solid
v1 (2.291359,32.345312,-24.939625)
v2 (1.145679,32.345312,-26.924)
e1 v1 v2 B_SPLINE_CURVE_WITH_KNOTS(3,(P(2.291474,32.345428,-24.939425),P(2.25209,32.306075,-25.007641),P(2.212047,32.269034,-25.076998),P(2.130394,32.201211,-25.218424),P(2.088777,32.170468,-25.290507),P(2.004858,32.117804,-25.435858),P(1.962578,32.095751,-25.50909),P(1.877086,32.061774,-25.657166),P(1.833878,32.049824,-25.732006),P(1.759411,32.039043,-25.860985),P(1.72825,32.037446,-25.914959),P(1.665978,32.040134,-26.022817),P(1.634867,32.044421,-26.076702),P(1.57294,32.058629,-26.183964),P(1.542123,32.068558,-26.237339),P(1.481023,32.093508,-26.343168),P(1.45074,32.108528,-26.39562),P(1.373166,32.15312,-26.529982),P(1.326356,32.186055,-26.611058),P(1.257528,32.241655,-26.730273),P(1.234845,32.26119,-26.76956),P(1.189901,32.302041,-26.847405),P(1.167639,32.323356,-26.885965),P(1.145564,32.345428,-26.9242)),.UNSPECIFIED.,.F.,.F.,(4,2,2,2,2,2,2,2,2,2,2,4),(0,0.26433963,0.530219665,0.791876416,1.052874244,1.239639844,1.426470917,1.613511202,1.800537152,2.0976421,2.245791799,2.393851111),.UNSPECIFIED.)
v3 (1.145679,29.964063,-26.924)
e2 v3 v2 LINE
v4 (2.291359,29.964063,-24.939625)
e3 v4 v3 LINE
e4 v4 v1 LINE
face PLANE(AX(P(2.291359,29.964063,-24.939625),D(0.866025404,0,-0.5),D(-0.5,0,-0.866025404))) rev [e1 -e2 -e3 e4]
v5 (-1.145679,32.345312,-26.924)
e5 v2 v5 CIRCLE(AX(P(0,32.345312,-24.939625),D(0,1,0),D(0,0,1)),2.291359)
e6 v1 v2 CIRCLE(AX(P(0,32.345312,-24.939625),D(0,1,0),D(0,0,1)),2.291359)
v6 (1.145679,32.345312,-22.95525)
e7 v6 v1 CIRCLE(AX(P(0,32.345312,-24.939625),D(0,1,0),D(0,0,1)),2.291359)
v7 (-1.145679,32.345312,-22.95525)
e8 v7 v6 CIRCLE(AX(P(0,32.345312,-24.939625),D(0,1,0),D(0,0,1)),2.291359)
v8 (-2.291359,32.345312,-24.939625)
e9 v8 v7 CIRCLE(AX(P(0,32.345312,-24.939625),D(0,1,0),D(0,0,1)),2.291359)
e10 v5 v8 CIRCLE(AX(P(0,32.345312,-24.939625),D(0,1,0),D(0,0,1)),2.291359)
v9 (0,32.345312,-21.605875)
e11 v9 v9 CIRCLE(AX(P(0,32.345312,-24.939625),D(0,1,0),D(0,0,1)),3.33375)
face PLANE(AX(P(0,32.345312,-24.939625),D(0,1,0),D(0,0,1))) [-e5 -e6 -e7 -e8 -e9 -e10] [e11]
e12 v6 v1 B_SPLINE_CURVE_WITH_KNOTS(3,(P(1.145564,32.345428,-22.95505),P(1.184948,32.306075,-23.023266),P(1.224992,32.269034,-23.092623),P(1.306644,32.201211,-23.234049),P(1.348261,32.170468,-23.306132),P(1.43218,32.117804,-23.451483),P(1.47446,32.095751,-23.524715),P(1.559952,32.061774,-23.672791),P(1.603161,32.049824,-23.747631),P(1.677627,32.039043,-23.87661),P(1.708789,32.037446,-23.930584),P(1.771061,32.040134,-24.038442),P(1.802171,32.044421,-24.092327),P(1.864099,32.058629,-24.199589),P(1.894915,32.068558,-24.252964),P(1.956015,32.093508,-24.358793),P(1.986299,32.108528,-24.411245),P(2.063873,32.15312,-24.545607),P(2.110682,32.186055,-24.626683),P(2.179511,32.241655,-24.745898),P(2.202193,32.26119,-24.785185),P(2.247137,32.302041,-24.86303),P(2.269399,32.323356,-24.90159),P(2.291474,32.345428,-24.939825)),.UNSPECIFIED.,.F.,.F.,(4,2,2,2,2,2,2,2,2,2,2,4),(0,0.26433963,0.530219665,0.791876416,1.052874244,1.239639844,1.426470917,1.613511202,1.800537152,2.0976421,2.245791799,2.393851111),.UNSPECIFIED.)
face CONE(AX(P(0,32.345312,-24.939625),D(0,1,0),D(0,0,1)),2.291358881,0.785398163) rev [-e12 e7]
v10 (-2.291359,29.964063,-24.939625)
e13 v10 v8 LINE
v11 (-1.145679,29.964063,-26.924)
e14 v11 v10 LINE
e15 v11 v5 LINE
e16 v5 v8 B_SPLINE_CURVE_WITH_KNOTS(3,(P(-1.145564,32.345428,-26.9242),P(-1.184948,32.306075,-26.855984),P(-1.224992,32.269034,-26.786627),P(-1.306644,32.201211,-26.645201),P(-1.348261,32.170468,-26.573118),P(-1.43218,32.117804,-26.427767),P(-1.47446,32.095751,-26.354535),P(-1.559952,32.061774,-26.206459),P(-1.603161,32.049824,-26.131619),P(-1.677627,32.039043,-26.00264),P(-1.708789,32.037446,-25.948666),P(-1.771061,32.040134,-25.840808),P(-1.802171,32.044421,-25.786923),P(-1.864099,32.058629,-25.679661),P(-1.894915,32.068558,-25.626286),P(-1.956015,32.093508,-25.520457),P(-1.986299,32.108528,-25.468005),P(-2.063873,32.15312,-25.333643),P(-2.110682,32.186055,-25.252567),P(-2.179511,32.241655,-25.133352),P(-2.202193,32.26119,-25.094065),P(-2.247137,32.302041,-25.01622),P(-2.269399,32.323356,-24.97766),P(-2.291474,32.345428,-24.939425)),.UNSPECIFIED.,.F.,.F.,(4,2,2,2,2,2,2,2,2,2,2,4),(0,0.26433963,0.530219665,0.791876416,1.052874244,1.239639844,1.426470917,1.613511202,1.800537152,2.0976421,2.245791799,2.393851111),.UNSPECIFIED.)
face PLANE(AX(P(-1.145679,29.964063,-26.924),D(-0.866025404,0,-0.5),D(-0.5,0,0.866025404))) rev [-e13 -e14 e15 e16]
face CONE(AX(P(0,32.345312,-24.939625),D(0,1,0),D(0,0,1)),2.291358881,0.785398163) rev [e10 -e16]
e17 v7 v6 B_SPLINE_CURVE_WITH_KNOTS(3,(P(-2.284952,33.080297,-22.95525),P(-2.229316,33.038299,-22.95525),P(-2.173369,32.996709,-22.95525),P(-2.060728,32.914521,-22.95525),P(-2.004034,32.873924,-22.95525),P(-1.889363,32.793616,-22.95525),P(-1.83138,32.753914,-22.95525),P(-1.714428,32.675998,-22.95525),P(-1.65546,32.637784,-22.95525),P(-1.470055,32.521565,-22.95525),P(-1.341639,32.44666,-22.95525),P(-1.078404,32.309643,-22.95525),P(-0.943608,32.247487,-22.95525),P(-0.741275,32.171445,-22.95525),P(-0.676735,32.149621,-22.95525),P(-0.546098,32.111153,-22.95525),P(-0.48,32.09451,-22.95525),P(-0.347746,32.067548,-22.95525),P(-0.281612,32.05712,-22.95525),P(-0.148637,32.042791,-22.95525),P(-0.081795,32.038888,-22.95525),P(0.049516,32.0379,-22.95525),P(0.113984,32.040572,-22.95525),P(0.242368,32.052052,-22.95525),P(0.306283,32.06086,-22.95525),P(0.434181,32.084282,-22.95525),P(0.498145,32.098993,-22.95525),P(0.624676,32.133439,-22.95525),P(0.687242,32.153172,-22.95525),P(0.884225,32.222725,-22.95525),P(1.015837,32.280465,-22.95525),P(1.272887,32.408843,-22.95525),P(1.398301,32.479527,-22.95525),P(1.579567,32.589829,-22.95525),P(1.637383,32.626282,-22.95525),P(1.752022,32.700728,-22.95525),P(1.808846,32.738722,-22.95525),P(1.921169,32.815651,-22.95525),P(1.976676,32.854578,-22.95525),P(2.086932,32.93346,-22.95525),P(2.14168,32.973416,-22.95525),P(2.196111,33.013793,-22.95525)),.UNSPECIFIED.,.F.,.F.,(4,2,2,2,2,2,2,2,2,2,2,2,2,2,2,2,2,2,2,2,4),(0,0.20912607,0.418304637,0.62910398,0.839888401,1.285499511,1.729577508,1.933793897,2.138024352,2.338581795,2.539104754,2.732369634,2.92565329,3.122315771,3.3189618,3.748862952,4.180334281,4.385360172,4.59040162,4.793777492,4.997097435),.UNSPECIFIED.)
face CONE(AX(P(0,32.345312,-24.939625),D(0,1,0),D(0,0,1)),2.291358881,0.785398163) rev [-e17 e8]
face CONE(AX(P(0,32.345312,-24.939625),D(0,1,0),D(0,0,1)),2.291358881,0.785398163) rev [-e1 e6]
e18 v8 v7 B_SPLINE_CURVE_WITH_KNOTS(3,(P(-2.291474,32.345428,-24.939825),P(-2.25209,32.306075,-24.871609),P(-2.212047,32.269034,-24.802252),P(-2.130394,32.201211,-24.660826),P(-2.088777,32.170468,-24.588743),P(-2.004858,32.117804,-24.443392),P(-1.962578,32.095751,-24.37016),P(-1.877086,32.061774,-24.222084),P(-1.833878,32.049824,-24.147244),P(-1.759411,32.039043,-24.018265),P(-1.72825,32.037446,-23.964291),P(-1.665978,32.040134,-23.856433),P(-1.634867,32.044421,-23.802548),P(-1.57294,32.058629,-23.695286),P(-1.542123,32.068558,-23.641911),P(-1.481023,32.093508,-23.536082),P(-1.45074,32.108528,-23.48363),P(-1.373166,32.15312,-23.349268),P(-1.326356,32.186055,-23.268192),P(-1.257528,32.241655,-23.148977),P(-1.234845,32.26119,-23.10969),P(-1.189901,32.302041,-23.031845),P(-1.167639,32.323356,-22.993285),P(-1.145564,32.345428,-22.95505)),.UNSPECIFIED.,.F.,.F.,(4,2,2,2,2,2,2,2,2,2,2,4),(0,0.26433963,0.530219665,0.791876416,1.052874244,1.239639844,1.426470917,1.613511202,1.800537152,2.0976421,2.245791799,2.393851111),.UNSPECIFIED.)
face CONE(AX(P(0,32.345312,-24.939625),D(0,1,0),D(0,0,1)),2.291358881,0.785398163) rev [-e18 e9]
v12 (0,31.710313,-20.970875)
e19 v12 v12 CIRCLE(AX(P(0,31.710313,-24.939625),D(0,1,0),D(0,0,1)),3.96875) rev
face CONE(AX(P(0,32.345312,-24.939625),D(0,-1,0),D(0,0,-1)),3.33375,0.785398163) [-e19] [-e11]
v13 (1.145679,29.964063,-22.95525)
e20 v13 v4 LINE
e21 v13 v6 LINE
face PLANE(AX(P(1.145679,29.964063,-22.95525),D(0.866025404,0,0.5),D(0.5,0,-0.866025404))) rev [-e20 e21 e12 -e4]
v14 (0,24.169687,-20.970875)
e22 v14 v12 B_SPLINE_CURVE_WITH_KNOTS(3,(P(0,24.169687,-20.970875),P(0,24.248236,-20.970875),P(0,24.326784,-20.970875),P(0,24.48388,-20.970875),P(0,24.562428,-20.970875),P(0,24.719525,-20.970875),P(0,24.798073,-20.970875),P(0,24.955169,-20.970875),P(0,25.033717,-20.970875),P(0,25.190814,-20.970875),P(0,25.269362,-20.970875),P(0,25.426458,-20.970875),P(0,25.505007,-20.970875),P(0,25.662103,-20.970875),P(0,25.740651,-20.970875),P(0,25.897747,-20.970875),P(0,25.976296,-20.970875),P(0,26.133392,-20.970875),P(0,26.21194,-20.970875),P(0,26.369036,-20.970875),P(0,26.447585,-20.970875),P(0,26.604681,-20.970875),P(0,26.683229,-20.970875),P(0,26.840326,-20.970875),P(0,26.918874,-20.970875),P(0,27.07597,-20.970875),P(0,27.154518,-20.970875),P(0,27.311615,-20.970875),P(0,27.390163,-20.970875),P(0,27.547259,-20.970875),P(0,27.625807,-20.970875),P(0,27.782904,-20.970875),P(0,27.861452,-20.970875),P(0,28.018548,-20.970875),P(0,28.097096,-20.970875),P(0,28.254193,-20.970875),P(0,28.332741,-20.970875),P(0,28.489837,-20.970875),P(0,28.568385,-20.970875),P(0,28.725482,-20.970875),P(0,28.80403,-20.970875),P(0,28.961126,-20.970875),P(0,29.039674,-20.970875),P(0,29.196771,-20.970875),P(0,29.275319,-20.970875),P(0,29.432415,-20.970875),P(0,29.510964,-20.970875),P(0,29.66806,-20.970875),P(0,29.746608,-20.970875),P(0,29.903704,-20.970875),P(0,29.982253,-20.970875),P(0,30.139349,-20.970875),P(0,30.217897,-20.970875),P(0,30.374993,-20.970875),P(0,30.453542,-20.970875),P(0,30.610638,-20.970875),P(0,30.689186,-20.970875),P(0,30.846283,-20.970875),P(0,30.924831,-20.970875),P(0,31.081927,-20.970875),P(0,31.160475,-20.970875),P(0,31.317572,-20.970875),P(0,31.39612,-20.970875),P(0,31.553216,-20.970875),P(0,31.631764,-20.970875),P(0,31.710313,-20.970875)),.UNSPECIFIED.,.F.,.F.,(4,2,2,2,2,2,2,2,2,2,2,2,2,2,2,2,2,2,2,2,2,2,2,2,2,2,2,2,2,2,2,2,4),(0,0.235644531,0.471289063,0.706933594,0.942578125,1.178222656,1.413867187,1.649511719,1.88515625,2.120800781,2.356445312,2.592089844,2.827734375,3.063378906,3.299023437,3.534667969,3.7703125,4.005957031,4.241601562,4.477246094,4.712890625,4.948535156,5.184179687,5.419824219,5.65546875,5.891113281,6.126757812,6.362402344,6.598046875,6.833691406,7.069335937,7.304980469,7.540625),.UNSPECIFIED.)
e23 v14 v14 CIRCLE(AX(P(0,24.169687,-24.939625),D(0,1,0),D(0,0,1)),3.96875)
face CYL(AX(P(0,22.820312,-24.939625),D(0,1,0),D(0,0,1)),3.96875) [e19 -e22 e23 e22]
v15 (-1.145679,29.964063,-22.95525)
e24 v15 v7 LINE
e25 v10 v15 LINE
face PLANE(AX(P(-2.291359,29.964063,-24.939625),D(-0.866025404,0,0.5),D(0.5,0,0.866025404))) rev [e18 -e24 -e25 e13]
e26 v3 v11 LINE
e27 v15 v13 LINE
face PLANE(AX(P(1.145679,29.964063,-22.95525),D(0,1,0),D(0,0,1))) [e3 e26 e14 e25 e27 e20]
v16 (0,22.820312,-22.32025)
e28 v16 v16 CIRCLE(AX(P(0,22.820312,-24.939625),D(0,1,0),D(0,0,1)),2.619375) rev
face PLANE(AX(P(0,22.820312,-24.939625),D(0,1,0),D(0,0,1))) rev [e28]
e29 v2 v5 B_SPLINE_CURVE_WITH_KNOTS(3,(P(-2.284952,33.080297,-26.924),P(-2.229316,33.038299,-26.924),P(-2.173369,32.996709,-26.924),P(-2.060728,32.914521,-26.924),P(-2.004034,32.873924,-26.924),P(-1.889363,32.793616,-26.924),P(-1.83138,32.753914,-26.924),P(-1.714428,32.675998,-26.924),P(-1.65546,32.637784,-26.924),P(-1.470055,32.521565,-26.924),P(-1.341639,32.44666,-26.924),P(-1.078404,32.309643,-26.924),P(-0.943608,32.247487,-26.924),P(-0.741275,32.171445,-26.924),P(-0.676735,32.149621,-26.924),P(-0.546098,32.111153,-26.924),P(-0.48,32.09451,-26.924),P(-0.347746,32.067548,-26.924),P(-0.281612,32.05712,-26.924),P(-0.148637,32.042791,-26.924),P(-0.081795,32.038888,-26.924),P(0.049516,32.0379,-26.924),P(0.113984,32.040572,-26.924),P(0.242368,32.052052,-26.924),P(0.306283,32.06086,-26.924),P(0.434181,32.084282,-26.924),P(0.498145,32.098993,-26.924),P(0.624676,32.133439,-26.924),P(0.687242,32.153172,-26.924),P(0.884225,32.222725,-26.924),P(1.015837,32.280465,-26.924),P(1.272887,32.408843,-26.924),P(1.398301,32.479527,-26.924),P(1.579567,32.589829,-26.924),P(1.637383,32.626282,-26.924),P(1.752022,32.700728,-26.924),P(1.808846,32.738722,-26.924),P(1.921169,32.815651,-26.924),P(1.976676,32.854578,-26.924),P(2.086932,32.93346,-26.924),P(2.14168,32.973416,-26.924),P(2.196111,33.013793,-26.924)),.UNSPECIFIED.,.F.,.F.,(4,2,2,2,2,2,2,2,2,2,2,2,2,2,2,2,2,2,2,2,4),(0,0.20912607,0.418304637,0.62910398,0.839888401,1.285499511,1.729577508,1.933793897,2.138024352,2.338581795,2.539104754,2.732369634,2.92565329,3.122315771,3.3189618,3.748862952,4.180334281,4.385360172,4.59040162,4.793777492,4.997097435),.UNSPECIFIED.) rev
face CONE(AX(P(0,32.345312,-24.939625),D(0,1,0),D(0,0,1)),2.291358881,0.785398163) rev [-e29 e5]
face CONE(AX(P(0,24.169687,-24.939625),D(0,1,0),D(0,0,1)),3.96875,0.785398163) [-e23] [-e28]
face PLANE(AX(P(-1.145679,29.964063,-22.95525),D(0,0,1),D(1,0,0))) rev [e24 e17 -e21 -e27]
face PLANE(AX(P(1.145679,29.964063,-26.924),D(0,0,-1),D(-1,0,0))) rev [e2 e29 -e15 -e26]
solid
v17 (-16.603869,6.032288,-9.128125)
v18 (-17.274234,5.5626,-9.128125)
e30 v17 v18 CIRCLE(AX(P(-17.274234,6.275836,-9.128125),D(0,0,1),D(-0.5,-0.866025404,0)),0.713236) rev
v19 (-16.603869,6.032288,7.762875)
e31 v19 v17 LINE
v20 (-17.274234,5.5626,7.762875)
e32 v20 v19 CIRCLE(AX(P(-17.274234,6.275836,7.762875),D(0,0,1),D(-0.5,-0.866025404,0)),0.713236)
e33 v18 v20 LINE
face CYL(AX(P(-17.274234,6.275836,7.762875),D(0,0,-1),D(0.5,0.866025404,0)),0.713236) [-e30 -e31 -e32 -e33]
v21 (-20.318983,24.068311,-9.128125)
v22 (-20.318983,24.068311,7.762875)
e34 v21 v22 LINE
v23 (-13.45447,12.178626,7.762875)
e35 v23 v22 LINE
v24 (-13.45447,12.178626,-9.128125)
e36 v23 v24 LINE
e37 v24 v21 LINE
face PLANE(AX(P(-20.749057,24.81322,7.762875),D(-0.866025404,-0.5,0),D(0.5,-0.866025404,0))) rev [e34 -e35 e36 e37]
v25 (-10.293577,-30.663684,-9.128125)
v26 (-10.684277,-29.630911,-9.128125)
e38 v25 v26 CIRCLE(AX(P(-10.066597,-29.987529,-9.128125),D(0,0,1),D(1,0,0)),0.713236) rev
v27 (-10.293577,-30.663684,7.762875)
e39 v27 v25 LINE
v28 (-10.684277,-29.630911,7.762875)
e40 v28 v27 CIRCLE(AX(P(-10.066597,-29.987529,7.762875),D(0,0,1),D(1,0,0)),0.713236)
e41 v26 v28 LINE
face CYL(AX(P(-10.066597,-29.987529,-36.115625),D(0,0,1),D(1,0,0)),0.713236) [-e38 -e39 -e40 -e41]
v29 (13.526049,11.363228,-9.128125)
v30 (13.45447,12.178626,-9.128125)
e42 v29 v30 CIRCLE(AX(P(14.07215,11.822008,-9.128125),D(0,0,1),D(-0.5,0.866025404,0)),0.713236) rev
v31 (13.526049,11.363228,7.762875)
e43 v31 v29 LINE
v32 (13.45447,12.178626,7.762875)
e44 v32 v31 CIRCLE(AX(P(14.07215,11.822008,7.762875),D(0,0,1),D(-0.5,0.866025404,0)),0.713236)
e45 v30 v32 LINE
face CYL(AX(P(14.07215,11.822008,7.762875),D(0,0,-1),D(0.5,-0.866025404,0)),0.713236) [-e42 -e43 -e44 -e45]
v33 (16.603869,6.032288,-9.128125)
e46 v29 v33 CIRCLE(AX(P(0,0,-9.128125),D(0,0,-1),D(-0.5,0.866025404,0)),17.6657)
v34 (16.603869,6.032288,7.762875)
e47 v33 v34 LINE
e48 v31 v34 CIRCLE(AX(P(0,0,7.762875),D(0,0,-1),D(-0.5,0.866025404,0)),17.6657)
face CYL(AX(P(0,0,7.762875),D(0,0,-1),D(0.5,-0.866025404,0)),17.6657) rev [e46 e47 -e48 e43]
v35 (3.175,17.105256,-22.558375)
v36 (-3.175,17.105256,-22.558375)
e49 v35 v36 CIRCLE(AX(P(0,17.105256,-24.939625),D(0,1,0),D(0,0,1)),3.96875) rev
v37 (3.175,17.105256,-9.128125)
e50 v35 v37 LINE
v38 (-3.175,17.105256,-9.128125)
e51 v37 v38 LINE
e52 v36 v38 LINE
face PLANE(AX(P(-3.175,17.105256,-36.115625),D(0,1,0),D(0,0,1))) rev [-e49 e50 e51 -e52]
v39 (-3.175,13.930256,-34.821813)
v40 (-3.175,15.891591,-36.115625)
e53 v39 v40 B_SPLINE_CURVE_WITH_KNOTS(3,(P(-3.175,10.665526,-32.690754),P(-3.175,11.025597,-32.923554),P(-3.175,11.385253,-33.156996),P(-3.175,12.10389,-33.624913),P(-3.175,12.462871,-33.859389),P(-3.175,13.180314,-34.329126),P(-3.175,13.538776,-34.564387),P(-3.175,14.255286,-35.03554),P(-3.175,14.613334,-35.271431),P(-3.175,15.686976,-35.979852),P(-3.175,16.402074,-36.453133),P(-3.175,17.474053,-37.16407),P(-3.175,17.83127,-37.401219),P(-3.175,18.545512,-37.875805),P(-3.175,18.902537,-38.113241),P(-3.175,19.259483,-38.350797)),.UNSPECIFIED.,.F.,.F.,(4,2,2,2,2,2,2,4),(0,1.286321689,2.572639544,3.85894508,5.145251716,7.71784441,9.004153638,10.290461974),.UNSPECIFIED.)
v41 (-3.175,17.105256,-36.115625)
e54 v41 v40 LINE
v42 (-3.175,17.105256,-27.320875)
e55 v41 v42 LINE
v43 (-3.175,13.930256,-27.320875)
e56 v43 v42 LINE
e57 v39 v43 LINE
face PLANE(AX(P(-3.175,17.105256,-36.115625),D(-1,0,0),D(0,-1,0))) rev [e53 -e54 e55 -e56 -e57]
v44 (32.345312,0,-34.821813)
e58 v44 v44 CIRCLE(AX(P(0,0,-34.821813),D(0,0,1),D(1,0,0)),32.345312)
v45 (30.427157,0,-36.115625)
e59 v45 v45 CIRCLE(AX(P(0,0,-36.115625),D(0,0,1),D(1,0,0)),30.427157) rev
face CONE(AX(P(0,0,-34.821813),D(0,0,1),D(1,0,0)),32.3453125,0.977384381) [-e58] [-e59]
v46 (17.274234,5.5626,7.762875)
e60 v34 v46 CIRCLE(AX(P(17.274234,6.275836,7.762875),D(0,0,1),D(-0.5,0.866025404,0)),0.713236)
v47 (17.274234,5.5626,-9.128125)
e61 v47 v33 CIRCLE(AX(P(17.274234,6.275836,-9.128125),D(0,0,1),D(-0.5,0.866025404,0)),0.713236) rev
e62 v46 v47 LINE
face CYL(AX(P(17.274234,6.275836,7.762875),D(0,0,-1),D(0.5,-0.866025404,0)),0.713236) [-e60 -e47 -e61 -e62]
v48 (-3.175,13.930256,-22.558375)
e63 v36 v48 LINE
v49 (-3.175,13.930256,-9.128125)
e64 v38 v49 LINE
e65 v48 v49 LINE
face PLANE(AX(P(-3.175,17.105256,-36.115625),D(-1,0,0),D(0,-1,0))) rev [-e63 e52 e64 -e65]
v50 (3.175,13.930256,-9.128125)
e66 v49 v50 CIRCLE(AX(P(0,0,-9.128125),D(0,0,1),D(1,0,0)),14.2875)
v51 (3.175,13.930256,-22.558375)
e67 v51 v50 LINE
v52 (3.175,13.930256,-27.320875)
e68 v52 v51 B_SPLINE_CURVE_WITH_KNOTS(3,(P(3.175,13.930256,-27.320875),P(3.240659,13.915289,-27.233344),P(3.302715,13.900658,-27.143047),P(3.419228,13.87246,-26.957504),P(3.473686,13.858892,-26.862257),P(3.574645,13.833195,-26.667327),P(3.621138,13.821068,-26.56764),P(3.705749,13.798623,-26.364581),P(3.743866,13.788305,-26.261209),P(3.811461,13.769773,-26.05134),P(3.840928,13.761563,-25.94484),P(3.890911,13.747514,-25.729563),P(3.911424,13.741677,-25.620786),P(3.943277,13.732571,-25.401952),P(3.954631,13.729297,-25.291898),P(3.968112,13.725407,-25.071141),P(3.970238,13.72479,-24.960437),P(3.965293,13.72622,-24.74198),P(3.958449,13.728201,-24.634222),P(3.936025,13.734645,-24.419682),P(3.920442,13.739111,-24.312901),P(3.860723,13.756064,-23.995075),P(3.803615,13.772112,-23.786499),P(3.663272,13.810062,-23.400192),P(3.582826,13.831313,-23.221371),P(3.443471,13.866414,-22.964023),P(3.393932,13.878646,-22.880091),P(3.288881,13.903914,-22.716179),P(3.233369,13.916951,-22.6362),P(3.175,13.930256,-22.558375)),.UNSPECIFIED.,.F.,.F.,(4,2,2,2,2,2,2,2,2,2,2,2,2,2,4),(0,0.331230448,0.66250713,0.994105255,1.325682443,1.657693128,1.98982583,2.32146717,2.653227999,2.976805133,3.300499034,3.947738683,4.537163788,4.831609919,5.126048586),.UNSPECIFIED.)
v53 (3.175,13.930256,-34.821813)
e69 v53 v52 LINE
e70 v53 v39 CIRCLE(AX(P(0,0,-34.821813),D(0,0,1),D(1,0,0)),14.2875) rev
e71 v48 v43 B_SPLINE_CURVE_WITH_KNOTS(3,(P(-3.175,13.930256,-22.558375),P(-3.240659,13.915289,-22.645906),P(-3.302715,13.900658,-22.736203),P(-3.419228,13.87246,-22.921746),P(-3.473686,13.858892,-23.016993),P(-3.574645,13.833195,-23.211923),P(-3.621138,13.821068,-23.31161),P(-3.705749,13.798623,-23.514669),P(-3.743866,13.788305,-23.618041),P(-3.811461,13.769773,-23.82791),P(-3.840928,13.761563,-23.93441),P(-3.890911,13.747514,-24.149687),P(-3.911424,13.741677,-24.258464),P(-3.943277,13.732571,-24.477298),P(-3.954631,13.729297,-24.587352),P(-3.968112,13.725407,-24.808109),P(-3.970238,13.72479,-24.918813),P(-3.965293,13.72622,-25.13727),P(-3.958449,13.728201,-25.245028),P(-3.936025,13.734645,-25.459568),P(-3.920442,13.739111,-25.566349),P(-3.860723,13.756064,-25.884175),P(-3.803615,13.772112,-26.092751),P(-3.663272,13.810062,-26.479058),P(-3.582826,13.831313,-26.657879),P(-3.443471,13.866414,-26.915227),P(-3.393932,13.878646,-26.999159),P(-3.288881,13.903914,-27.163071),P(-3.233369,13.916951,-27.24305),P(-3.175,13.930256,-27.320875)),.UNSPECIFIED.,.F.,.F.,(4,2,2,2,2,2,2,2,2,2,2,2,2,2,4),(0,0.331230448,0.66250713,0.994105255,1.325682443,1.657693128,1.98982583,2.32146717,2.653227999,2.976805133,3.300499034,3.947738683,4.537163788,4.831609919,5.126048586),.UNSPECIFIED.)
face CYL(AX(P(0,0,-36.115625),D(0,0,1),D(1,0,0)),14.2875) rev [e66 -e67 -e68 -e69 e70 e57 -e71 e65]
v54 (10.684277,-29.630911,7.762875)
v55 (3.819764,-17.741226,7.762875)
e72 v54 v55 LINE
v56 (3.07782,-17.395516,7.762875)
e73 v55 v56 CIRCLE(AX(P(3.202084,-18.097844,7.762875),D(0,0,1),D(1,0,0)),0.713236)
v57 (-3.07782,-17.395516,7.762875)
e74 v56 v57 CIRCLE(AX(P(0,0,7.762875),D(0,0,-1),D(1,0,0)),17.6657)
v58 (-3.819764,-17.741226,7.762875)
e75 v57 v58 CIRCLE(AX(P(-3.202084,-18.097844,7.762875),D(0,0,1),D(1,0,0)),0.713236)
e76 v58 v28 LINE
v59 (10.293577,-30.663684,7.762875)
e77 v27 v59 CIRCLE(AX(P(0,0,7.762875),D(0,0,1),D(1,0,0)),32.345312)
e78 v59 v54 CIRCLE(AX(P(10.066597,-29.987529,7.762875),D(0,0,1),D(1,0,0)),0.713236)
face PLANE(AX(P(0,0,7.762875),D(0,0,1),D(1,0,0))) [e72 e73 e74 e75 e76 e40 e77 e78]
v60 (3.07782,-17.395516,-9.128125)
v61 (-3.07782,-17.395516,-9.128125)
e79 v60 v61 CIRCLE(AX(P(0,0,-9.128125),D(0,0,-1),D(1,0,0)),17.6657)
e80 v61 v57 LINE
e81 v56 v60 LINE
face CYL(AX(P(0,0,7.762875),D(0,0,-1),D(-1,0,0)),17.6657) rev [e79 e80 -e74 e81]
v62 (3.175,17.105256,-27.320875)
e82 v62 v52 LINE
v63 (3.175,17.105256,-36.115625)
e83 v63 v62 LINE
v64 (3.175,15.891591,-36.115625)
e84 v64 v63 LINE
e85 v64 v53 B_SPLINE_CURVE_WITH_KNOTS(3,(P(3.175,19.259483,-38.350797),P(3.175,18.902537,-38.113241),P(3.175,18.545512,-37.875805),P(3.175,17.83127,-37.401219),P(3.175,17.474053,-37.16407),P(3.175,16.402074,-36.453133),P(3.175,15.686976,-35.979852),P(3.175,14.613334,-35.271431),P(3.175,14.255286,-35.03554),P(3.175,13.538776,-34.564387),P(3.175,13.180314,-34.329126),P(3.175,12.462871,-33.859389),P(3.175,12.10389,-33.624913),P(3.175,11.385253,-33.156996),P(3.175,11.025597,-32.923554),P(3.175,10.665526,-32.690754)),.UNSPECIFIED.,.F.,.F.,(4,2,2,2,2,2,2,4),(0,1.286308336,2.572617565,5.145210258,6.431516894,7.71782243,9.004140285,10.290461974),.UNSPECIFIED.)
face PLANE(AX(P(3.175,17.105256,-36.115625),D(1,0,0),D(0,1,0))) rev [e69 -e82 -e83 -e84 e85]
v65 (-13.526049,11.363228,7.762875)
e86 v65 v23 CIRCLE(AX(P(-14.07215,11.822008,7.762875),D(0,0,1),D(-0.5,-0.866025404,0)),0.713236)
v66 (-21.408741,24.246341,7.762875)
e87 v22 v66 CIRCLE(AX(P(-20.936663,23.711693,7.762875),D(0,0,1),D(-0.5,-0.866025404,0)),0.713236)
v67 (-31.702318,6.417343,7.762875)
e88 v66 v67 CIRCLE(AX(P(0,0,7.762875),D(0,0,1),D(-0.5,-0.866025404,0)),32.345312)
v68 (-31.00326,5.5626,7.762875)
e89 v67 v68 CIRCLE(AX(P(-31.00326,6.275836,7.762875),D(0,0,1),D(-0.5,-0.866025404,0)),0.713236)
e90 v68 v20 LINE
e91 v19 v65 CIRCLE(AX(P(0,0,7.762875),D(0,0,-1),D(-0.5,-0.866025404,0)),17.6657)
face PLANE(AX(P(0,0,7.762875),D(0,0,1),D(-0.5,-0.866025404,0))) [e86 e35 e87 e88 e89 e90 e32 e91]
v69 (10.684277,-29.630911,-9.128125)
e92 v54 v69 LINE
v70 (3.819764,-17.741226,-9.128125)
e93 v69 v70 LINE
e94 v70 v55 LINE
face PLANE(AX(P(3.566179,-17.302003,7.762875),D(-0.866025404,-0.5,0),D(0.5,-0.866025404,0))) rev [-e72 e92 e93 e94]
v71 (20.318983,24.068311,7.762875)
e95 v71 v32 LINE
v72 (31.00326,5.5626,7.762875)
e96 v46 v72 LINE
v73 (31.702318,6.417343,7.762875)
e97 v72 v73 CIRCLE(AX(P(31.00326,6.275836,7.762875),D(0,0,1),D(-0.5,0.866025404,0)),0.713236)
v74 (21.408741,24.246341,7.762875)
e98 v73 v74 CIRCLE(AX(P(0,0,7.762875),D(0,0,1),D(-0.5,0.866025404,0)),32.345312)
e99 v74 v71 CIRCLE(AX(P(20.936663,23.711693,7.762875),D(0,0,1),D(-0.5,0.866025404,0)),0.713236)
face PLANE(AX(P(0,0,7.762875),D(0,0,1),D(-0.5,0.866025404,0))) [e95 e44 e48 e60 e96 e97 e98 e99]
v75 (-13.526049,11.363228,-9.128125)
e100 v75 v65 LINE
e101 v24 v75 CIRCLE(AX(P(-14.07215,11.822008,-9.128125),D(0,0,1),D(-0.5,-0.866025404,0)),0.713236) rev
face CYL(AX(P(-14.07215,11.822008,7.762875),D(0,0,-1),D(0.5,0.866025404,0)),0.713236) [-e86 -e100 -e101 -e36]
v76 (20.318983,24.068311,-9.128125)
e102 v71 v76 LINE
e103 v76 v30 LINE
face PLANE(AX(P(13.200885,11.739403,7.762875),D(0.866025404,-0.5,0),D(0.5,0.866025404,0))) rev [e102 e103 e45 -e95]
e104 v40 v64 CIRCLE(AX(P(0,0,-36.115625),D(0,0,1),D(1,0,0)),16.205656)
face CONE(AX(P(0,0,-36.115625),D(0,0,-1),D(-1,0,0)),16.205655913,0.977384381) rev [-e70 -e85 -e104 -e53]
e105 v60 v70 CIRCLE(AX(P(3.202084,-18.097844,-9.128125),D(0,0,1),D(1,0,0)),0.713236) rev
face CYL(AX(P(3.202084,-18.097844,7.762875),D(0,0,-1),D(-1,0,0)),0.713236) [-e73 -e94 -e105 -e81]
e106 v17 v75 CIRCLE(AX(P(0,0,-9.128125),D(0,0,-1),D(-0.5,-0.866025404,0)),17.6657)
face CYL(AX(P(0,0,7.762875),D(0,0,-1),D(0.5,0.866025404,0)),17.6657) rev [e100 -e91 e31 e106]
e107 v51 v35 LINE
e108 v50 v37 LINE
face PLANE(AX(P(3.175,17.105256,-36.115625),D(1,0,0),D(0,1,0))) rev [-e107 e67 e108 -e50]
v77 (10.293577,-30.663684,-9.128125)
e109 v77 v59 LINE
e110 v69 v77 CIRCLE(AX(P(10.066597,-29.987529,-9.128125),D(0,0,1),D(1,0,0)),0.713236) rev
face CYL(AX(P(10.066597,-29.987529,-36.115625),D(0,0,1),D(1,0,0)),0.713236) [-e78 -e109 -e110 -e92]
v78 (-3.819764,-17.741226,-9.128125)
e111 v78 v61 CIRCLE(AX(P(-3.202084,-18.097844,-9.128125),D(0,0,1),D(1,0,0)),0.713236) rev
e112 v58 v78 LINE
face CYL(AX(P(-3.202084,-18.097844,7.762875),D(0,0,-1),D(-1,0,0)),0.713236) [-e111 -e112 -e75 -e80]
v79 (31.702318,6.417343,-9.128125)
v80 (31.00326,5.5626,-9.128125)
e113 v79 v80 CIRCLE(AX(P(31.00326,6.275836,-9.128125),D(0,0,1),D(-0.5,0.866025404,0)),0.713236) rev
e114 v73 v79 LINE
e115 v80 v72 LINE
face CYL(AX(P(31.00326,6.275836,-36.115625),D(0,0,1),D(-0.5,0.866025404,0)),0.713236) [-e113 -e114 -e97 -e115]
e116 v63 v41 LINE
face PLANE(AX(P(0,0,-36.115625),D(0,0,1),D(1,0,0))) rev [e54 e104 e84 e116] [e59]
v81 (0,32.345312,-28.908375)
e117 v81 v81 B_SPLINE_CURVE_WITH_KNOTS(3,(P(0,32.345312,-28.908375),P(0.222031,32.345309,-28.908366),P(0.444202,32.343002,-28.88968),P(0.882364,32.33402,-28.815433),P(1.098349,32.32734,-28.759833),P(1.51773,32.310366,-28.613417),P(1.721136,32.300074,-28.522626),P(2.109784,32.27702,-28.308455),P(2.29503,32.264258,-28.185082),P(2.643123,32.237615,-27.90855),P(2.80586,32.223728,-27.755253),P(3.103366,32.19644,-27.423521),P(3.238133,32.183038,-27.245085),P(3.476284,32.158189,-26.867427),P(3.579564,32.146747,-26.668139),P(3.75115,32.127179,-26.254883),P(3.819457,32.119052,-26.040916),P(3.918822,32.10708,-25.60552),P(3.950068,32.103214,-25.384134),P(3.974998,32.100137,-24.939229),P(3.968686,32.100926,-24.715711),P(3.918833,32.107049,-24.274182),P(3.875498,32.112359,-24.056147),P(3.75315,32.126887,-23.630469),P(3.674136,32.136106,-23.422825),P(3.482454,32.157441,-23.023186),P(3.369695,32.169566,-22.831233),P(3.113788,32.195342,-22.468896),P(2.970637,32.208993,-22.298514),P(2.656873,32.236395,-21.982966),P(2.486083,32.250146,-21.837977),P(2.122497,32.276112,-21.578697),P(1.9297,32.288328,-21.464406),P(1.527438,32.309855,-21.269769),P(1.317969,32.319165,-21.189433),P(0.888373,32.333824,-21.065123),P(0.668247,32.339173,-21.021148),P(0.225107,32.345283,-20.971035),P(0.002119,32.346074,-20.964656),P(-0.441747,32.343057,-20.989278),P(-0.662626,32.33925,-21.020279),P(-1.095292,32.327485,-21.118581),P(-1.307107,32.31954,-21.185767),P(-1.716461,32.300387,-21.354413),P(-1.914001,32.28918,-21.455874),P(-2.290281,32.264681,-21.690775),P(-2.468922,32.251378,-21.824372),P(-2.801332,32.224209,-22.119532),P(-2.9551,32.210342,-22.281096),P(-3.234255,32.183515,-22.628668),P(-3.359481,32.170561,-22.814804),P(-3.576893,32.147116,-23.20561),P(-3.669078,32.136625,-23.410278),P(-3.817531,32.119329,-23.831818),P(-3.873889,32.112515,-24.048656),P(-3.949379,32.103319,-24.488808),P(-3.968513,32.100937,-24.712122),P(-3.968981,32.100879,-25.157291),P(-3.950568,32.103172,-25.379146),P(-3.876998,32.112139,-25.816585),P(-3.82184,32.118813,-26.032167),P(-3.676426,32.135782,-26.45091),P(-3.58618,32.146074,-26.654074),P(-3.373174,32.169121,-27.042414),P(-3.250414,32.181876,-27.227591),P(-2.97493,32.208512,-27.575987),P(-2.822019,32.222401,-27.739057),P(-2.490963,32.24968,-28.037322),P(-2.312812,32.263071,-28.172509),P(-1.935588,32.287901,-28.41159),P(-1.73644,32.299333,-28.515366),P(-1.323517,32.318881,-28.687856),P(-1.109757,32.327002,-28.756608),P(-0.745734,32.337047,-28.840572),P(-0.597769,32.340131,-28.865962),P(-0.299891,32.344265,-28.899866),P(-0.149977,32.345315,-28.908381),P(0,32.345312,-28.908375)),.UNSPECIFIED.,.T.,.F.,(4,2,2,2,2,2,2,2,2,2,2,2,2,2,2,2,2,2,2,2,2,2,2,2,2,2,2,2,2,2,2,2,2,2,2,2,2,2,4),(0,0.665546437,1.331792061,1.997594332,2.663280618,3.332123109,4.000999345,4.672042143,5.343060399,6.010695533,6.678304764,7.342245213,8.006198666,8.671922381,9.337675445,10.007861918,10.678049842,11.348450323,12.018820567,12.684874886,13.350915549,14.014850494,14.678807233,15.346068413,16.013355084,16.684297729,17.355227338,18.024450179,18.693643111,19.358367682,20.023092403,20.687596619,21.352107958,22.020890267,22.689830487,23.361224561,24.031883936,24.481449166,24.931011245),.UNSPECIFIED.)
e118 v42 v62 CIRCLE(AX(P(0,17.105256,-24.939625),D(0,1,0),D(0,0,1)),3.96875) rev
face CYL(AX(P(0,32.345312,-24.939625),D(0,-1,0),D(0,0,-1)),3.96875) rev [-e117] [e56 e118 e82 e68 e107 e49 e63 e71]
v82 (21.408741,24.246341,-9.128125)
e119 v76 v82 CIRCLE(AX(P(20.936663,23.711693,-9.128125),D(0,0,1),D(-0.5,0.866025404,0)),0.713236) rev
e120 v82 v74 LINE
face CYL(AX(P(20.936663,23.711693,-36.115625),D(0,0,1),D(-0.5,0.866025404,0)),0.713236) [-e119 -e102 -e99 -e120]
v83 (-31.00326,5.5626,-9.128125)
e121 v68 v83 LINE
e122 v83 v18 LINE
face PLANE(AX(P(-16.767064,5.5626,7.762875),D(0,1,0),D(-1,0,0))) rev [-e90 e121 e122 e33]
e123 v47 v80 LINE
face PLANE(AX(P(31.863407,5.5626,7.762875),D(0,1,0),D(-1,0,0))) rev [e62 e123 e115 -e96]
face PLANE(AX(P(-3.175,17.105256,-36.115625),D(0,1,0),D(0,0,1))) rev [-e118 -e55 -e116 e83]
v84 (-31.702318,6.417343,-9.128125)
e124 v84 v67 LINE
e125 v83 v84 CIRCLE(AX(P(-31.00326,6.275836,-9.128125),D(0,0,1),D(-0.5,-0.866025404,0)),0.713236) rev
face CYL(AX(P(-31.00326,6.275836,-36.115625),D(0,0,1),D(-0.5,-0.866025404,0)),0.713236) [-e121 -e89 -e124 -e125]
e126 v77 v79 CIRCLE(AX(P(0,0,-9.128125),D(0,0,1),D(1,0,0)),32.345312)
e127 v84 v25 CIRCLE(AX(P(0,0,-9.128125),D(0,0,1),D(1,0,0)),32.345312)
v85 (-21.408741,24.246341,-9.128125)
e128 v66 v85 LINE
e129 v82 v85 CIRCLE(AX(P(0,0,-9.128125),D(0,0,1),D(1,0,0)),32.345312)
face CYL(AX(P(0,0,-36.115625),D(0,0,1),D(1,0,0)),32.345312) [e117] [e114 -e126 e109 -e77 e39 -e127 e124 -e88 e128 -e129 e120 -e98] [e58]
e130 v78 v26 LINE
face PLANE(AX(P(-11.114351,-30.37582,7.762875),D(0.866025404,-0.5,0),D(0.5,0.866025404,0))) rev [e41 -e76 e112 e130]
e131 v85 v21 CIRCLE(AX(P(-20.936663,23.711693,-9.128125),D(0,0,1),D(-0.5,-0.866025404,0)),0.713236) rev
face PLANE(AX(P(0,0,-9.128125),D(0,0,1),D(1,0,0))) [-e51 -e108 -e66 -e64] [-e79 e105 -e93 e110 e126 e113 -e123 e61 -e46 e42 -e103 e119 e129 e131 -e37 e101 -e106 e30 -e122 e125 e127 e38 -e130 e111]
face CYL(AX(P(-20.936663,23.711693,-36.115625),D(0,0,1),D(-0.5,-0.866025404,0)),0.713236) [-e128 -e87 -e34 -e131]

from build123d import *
from OCP.BRepFilletAPI import BRepFilletAPI_MakeChamfer

# Parameters (mm, degrees)
BOSS_EXTRUDE1_START      = -9.128125
SKETCH1_R                = 32.3453125
BOSS_EXTRUDE1_DEPTH      = 26.9875
BOSS_EXTRUDE2_DEPTH      = 16.891
FILLET1_R                = 0.713235825
CIRPATTERN1_COUNT        = 3
FILLET1_OF_CIRPATTERN1_R = 0.713235825
CUT_EXTRUDE5_DEPTH       = 59.281874117
CUT_EXTRUDE5_DEPTH_BACK  = 59.281874117
SKETCH15_R               = 14.2875
CHAMFER1_SIZE            = 1.2938125
CHAMFER1_SIZE2           = 1.918155913
CUT_EXTRUDE1_DEPTH       = 59.281874117
CUT_EXTRUDE1_DEPTH_BACK  = 59.281874117
SKETCH5_R                = 3.96875
CUT_EXTRUDE2_DEPTH       = 59.281874117
SKETCH6_R                = 3.96875
BOSS_EXTRUDE3_DEPTH      = 9.525
CUT_EXTRUDE3_DEPTH       = 2.38125
CHAMFER3_SIZE            = 0.635
CHAMFER4_SIZE            = 1.349375


with BuildPart() as part:
    # Sketch1 → Boss-Extrude1 (new body)
    with BuildSketch(Plane.XY.offset(BOSS_EXTRUDE1_START)):
        Circle(SKETCH1_R)
    extrude(amount=-BOSS_EXTRUDE1_DEPTH)

    # Sketch2 → Boss-Extrude2 (add)
    with BuildSketch(Plane.XY.offset(-9.128125)):
        with BuildLine():
            Line((-11.114350717, -30.375820135), (-3.566179127, -17.302003437))
            ThreePointArc((-3.566179127, -17.302003437), (0, -17.6657), (3.566179127, -17.302003437))
            Line((3.566179127, -17.302003437), (11.114350717, -30.375820135))
            ThreePointArc((11.114350717, -30.375820135), (0, -32.3453125), (-11.114350717, -30.375820135))
        make_face()
    boss_extrude2 = extrude(amount=BOSS_EXTRUDE2_DEPTH)

    # Fillet1
    # the kernel refuses this fillet: 0.713235825 mm, written as the material it takes off along each edge
    with BuildSketch(Plane(origin=(-11.114350717, -30.375820135, -9.128125), x_dir=(0.9436455754007305, -0.3309577435664929, 0), z_dir=(0, 0, 1))) as fillet1_piece_1:
        with BuildLine():
            CenterArc((0.860200247, 0.713171354), FILLET1_R, 169.326916929, 101.443469756)
            Line((0.159303464, 0.845266176), (0, 0))
            ThreePointArc((0, 0), (0.434894987, -0.002923796), (0.869789973, 0))
        make_face()
    extrude(amount=19.065474933, mode=Mode.SUBTRACT)
    with BuildSketch(Plane(origin=(11.114350717, -30.375820135, -9.128125), x_dir=(-0.9436455754007282, -0.3309577435664989, 0), z_dir=(0, 0, 1))) as fillet1_piece_2:
        with BuildLine():
            CenterArc((0.860200247, -0.713171354), FILLET1_R, 89.229613314, 101.443469756)
            Line((0.159303464, -0.845266176), (0, 0))
            ThreePointArc((0, 0), (0.434894987, 0.002923796), (0.869789973, 0))
        make_face()
    extrude(amount=19.065474933, mode=Mode.SUBTRACT)
    with BuildSketch(Plane(origin=(3.566179127, -17.302003437, -9.128125), x_dir=(0.500000000000002, -0.8660254037844376, 0), z_dir=(0, 0, 1))) as fillet1_piece_3:
        with BuildLine():
            CenterArc((0.507170112, -0.713235825), FILLET1_R, 90, 70.033604576)
            ThreePointArc((-0.163195289, -0.469687941), (-0.07994504, -0.235418176), (0, 0))
            Line((0, 0), (0.507170112, 0))
        make_face()
    extrude(amount=18.158925279, mode=Mode.SUBTRACT)
    with BuildSketch(Plane(origin=(-3.566179127, -17.302003437, -9.128125), x_dir=(0.9821562739684868, -0.18806661985673784, 0), z_dir=(0, 0, 1))) as fillet1_piece_4:
        with BuildLine():
            CenterArc((0.507269431, -0.71316519), FILLET1_R, 90.806371221, 70.033604577)
            Line((-0.166457119, -0.479075724), (0, 0))
            ThreePointArc((0, 0), (0.248615901, -0.001749518), (0.497231801, 0))
        make_face()
    extrude(amount=18.158925279, mode=Mode.SUBTRACT)

    # CirPattern1: Boss-Extrude2 ×3 about axis
    cirpattern1_axis = Axis((0, 0, 0), (0, 0, 1))
    for i in range(1, CIRPATTERN1_COUNT):
        add(boss_extrude2.rotate(cirpattern1_axis, i * 360 / CIRPATTERN1_COUNT))

    # Fillet1 of CirPattern1
    # the kernel refuses this fillet: 0.713235825 mm, written as the material it takes off along each edge
    with BuildSketch(Plane(origin=(31.863407256, 5.5626, -9.128125), x_dir=(-0.18520497419260348, 0.9826999122490635, 0), z_dir=(0, 0, 1)), Plane(origin=(-20.749056539, 24.813220135, -9.128125), x_dir=(-0.7584406012081224, -0.6517421686825718, 0), z_dir=(0, 0, 1))) as fillet1_of_cirpattern1_piece_1:
        with BuildLine():
            CenterArc((0.860200247, 0.713171354), FILLET1_OF_CIRPATTERN1_R, 169.326916929, 101.443469756)
            Line((0.159303464, 0.845266176), (0, 0))
            ThreePointArc((0, 0), (0.434894987, -0.002923796), (0.869789973, 0))
        make_face()
    extrude(amount=19.065474933, mode=Mode.SUBTRACT)
    with BuildSketch(Plane(origin=(20.749056539, 24.813220135, -9.128125), x_dir=(0.7584406012081266, -0.6517421686825667, 0), z_dir=(0, 0, 1)), Plane(origin=(-31.863407256, 5.5626, -9.128125), x_dir=(0.18520497419260348, 0.9826999122490635, 0), z_dir=(0, 0, 1))) as fillet1_of_cirpattern1_piece_2:
        with BuildLine():
            CenterArc((0.860200247, -0.713171354), FILLET1_OF_CIRPATTERN1_R, 89.229613314, 101.443469756)
            Line((0.159303464, -0.845266176), (0, 0))
            ThreePointArc((0, 0), (0.434894987, 0.002923796), (0.869789973, 0))
        make_face()
    extrude(amount=19.065474933, mode=Mode.SUBTRACT)
    with BuildSketch(Plane(origin=(13.200884949, 11.739403437, -9.128125), x_dir=(0.49999999999999967, 0.8660254037844388, 0), z_dir=(0, 0, 1)), Plane(origin=(-16.767064076, 5.5626, -9.128125), x_dir=(-1, 0, 0), z_dir=(0, 0, 1))) as fillet1_of_cirpattern1_piece_3:
        with BuildLine():
            CenterArc((0.507170112, -0.713235825), FILLET1_OF_CIRPATTERN1_R, 90, 70.033604576)
            ThreePointArc((-0.163195289, -0.469687941), (-0.07994504, -0.235418176), (0, 0))
            Line((0, 0), (0.507170112, 0))
        make_face()
    extrude(amount=18.158925279, mode=Mode.SUBTRACT)
    with BuildSketch(Plane(origin=(16.767064076, 5.5626, -9.128125), x_dir=(-0.3282076665844337, 0.9446055936713488, 0), z_dir=(0, 0, 1)), Plane(origin=(-13.200884949, 11.739403437, -9.128125), x_dir=(-0.6539486073840537, -0.7565389738146059, 0), z_dir=(0, 0, 1))) as fillet1_of_cirpattern1_piece_4:
        with BuildLine():
            CenterArc((0.507269431, -0.71316519), FILLET1_OF_CIRPATTERN1_R, 90.806371221, 70.033604577)
            Line((-0.166457119, -0.479075724), (0, 0))
            ThreePointArc((0, 0), (0.248615901, -0.001749518), (0.497231801, 0))
        make_face()
    extrude(amount=18.158925279, mode=Mode.SUBTRACT)

    # Sketch15 → Cut-Extrude5 (cut, two sides: drawn at the far end of the back side and taken through both)
    with BuildSketch(Plane.XY.offset(-CUT_EXTRUDE5_DEPTH_BACK)):
        Circle(SKETCH15_R)
    extrude(amount=CUT_EXTRUDE5_DEPTH + CUT_EXTRUDE5_DEPTH_BACK, mode=Mode.SUBTRACT)

    # Chamfer1: one chamfer whose edges measure the first distance from different faces: ONE call of the kernel's chamfer builder (chamfer() names one face for all edges)
    chamfer1_edges_1 = [part.edges().sort_by_distance(p)[0] for p in [
        (-32.3453125, 0, -36.115625),
    ]]
    chamfer1_side_1 = [part.faces().sort_by_distance(p)[0] for p in [
        (-32.3453125, 0, -22.621875),
    ]]
    chamfer1_edges_2 = [part.edges().sort_by_distance(p)[0] for p in [
        (-14.2875, 0, -36.115625),
    ]]
    chamfer1_side_2 = [part.faces().sort_by_distance(p)[0] for p in [
        (-14.2875, 0, -22.621875),
    ]]
    chamfer1 = BRepFilletAPI_MakeChamfer(part.part.solid().wrapped)
    for e in chamfer1_edges_1:
        chamfer1.Add(CHAMFER1_SIZE, CHAMFER1_SIZE2, e.wrapped, chamfer1_side_1[0].wrapped)  # the first distance lies on this face
    for e in chamfer1_edges_2:
        chamfer1.Add(CHAMFER1_SIZE, CHAMFER1_SIZE2, e.wrapped, chamfer1_side_2[0].wrapped)  # the first distance lies on this face
    add(Compound.cast(chamfer1.Shape()), mode=Mode.REPLACE)

    # Sketch4 → Cut-Extrude1 (cut, two sides: drawn at the far end of the back side and taken through both)
    with BuildSketch(Plane.XY.offset(-CUT_EXTRUDE1_DEPTH_BACK)):
        with BuildLine():
            Line((-3.175, 17.105255965), (3.175, 17.105255965))
            Line((3.175, 17.105255965), (3.175, 13.930255965))
            ThreePointArc((3.175, 13.930255965), (0, 14.2875), (-3.175, 13.930255965))
            Line((-3.175, 13.930255965), (-3.175, 17.105255965))
        make_face()
    extrude(amount=CUT_EXTRUDE1_DEPTH + CUT_EXTRUDE1_DEPTH_BACK, mode=Mode.SUBTRACT)

    # Sketch5 → Cut-Extrude2 (cut, through all)
    with BuildSketch(Plane(origin=(0, 0, 0), x_dir=(1, 0, 0), z_dir=(0, 1, 0))):
        with Locations(Location((0, 24.939625, 0), (0, 0, 90))):
            Circle(SKETCH5_R)
    extrude(amount=CUT_EXTRUDE2_DEPTH, mode=Mode.SUBTRACT)


with BuildPart() as body_2:
    # Sketch6 → Boss-Extrude3 (new body)
    with BuildSketch(Plane(origin=(0, 32.3453125, 0), x_dir=(-1, 0, 0), z_dir=(0, 1, 0))):
        with Locations(Location((0, -24.939625, 0), (0, 0, 90))):
            Circle(SKETCH6_R)
    extrude(amount=-BOSS_EXTRUDE3_DEPTH)

    # Sketch8 → Cut-Extrude3 (cut)
    with BuildSketch(Plane(origin=(0, 32.3453125, 0), x_dir=(1, 0, 0), z_dir=(0, 1, 0))):
        Polygon((1.14567944, 22.95525), (2.291358881, 24.939625), (1.14567944, 26.924), (-1.14567944, 26.924), (-2.291358881, 24.939625), (-1.14567944, 22.95525), align=None)
    extrude(amount=-CUT_EXTRUDE3_DEPTH, mode=Mode.SUBTRACT)

    # Cut-Extrude4 cone 1 section (through the dimple's axis) → Cut-Extrude4 (revolve, cut)
    with BuildSketch(Plane(origin=(0, 32.3453125, -24.939625), x_dir=(0, 0, 1), z_dir=(1, 0, 0))):
        Polygon((0, 0), (2.291358881, 0), (0, 2.291358881), align=None)
    revolve(axis=Axis((0, 32.3453125, -24.939625), (0, -1, 0)), mode=Mode.SUBTRACT)

    # Chamfer3
    chamfer3_edges = [body_2.edges().sort_by_distance(p)[0] for p in [
        (0, 32.3453125, -28.908375),
    ]]
    chamfer(chamfer3_edges, length=CHAMFER3_SIZE)

    # Chamfer4
    chamfer4_edges = [body_2.edges().sort_by_distance(p)[0] for p in [
        (0, 22.8203125, -28.908375),
    ]]
    chamfer(chamfer4_edges, length=CHAMFER4_SIZE)


solid = Compound([part.part, body_2.part])
